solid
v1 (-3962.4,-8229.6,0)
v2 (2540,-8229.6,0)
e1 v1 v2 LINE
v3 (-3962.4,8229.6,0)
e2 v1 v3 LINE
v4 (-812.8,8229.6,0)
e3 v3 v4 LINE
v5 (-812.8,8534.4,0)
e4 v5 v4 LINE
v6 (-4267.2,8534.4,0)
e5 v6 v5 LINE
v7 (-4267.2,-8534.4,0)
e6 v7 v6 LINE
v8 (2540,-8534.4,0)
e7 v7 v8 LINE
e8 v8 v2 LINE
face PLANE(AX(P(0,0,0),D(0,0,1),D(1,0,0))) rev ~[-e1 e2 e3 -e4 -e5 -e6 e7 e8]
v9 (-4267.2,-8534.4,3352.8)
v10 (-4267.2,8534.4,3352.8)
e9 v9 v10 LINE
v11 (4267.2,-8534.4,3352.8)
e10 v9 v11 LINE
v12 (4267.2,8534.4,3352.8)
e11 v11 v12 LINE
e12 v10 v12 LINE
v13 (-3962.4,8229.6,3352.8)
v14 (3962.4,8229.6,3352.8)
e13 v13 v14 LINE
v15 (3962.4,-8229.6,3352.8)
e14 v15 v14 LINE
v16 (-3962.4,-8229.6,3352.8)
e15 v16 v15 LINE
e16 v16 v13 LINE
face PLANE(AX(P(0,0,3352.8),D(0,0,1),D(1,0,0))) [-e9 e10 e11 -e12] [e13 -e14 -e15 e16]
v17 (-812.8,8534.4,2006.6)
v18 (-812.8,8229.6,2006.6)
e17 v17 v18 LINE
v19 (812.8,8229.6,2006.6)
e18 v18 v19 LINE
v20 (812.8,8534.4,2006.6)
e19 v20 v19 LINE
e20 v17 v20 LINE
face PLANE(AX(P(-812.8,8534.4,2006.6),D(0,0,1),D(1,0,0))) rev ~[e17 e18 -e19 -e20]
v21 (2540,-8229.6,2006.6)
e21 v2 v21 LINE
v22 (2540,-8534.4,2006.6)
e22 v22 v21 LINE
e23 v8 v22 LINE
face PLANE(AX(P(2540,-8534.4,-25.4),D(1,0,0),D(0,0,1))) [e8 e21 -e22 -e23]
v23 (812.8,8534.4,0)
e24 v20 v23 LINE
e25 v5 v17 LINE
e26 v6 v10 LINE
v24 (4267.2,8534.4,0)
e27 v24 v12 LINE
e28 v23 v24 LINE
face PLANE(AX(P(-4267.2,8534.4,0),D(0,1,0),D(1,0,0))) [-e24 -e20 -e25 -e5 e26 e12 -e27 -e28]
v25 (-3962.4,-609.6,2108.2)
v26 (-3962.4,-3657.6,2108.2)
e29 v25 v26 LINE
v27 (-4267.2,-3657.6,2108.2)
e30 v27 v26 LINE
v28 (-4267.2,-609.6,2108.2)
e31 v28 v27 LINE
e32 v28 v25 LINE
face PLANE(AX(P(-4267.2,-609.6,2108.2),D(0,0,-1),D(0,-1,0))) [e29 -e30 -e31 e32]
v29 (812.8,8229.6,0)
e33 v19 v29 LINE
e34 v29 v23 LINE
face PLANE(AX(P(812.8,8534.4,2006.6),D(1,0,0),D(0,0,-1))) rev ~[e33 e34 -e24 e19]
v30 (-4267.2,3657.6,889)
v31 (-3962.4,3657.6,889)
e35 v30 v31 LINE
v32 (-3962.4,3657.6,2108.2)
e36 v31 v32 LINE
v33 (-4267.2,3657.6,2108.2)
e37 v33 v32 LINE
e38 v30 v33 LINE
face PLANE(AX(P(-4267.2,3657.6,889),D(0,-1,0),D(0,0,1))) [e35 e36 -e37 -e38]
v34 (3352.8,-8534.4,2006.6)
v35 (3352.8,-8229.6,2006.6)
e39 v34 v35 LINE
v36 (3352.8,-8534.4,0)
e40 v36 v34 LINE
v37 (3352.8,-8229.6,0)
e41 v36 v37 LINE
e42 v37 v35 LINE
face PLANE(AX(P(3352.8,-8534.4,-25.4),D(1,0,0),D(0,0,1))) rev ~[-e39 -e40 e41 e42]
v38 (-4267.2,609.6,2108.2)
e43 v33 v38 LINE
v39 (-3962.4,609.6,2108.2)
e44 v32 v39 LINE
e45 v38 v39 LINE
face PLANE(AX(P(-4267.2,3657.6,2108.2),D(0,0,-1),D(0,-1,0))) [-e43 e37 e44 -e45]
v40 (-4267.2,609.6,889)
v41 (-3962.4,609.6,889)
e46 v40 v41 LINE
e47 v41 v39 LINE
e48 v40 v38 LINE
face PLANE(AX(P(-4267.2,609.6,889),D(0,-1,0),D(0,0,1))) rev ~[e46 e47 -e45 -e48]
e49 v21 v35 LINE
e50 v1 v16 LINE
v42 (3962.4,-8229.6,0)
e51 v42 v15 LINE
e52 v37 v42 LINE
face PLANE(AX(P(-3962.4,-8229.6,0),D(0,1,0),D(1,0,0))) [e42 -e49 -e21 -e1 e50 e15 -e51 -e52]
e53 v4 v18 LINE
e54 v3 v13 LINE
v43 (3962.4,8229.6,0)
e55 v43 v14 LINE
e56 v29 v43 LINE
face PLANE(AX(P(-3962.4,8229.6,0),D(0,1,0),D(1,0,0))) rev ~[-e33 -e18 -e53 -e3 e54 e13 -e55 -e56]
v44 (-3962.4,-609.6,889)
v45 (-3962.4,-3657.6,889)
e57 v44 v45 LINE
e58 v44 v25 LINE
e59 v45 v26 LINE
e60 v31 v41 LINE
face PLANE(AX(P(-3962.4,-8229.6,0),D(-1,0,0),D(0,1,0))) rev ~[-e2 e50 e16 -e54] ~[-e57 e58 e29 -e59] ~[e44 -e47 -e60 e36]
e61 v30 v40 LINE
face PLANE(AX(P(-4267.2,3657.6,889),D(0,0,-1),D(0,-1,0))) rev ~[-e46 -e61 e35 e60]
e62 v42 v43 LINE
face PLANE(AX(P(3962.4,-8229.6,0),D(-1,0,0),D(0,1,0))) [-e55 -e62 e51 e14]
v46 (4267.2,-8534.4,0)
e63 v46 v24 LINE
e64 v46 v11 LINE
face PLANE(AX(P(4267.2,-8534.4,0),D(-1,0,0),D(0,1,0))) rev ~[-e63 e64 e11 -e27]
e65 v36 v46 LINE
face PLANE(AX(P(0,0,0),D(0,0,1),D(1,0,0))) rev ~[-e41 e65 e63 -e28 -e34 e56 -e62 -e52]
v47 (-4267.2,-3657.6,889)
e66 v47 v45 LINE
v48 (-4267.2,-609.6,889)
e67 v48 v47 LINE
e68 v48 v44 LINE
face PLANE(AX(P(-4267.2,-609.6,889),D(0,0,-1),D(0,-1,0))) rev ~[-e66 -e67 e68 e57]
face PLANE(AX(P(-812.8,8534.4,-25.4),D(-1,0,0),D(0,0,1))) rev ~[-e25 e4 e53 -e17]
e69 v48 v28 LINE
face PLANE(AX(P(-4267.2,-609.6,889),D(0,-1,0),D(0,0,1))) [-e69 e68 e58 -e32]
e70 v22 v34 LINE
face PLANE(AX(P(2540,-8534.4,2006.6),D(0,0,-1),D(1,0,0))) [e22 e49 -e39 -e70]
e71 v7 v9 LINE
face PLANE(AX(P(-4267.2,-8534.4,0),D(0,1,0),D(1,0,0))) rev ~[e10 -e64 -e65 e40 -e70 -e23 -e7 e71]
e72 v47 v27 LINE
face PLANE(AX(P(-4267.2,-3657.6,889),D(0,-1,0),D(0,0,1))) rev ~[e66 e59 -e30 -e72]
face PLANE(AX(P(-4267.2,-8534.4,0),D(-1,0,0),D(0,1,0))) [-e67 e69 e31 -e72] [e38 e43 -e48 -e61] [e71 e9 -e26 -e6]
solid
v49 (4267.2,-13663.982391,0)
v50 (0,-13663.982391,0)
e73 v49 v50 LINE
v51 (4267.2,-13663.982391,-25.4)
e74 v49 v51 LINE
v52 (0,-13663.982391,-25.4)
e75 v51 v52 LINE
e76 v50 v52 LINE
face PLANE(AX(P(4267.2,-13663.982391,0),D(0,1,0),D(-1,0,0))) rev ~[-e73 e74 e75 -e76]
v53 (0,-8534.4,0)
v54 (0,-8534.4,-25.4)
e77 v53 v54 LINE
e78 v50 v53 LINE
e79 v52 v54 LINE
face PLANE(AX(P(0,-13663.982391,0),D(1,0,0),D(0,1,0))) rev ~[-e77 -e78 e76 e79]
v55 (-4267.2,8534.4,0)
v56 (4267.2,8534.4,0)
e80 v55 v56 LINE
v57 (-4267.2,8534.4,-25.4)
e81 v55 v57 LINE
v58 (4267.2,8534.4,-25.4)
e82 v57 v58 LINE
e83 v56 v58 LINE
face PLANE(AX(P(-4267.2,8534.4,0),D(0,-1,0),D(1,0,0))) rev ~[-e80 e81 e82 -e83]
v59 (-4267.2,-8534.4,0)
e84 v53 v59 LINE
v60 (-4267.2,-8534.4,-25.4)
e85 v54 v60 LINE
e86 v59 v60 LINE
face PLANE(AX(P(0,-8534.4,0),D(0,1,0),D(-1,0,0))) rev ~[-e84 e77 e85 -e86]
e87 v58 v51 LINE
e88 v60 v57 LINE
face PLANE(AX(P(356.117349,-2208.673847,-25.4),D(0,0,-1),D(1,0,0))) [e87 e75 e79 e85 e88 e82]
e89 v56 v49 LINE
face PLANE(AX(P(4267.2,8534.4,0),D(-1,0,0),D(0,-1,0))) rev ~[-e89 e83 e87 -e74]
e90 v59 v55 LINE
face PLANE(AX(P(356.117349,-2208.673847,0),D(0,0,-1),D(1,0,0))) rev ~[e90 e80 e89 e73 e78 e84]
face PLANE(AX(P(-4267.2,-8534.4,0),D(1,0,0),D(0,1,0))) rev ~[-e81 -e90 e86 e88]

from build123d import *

# Parameters (mm, degrees)
F0_W     = 8534.4
F0_H     = 17068.8
F0_W_2   = 7924.8
F0_H_2   = 16459.2
F1_DEPTH = 3352.8
F3_DEPTH = 25.4
F4_W     = 812.8
F4_H     = 2032
F5_DEPTH = 304.8
F6_W     = 3048
F6_H     = 1219.2
F7_DEPTH = 304.8
F9_DEPTH = 304.8


with BuildPart() as f1:
    # F0 (on Top) → F1 (new body)
    with BuildSketch(Plane.XY):
        Rectangle(F0_W, F0_H)
        Rectangle(F0_W_2, F0_H_2, mode=Mode.SUBTRACT)
    extrude(amount=F1_DEPTH)

    # F4 (on face) → F5 (cut, through all)
    with BuildSketch(Plane.XZ.offset(8534.4)):
        with Locations((2946.4, 990.6)):
            Rectangle(F4_W, F4_H)
    extrude(amount=-F5_DEPTH, mode=Mode.SUBTRACT)

    # F6 (on face) → F7 (cut, through all)
    with BuildSketch(Plane(origin=(-4267.2, 0, 0), x_dir=(0, -1, 0), z_dir=(-1, 0, 0))):
        with Locations((-2133.6, 1498.6)):
            Rectangle(F6_W, F6_H)
        with Locations((2133.6, 1498.6)):
            Rectangle(F6_W, F6_H)
    extrude(amount=-F7_DEPTH, mode=Mode.SUBTRACT)

    # F8 (on face) → F9 (cut, through all)
    with BuildSketch(Plane(origin=(0, 8534.4, 0), x_dir=(-1, 0, 0), z_dir=(0, 1, 0))):
        Polygon((812.8, 2006.6), (0, 2006.6), (-812.8, 2006.6), (-812.8, -25.4), (0, -25.4), (812.8, -25.4), align=None)
    extrude(amount=-F9_DEPTH, mode=Mode.SUBTRACT)


with BuildPart() as f3:
    # F2 (on face) → F3 (new body)
    with BuildSketch(Plane(origin=(0, 0, 0), x_dir=(1, 0, 0), z_dir=(0, 0, -1))):
        Polygon((0, 8534.4), (-4267.2, 8534.4), (-4267.2, -8534.4), (4267.2, -8534.4), (4267.2, 8534.4), (4267.2, 13663.9823913574), (0, 13663.9823913574), align=None)
    extrude(amount=F3_DEPTH)


solid = Compound([f1.part, f3.part])
